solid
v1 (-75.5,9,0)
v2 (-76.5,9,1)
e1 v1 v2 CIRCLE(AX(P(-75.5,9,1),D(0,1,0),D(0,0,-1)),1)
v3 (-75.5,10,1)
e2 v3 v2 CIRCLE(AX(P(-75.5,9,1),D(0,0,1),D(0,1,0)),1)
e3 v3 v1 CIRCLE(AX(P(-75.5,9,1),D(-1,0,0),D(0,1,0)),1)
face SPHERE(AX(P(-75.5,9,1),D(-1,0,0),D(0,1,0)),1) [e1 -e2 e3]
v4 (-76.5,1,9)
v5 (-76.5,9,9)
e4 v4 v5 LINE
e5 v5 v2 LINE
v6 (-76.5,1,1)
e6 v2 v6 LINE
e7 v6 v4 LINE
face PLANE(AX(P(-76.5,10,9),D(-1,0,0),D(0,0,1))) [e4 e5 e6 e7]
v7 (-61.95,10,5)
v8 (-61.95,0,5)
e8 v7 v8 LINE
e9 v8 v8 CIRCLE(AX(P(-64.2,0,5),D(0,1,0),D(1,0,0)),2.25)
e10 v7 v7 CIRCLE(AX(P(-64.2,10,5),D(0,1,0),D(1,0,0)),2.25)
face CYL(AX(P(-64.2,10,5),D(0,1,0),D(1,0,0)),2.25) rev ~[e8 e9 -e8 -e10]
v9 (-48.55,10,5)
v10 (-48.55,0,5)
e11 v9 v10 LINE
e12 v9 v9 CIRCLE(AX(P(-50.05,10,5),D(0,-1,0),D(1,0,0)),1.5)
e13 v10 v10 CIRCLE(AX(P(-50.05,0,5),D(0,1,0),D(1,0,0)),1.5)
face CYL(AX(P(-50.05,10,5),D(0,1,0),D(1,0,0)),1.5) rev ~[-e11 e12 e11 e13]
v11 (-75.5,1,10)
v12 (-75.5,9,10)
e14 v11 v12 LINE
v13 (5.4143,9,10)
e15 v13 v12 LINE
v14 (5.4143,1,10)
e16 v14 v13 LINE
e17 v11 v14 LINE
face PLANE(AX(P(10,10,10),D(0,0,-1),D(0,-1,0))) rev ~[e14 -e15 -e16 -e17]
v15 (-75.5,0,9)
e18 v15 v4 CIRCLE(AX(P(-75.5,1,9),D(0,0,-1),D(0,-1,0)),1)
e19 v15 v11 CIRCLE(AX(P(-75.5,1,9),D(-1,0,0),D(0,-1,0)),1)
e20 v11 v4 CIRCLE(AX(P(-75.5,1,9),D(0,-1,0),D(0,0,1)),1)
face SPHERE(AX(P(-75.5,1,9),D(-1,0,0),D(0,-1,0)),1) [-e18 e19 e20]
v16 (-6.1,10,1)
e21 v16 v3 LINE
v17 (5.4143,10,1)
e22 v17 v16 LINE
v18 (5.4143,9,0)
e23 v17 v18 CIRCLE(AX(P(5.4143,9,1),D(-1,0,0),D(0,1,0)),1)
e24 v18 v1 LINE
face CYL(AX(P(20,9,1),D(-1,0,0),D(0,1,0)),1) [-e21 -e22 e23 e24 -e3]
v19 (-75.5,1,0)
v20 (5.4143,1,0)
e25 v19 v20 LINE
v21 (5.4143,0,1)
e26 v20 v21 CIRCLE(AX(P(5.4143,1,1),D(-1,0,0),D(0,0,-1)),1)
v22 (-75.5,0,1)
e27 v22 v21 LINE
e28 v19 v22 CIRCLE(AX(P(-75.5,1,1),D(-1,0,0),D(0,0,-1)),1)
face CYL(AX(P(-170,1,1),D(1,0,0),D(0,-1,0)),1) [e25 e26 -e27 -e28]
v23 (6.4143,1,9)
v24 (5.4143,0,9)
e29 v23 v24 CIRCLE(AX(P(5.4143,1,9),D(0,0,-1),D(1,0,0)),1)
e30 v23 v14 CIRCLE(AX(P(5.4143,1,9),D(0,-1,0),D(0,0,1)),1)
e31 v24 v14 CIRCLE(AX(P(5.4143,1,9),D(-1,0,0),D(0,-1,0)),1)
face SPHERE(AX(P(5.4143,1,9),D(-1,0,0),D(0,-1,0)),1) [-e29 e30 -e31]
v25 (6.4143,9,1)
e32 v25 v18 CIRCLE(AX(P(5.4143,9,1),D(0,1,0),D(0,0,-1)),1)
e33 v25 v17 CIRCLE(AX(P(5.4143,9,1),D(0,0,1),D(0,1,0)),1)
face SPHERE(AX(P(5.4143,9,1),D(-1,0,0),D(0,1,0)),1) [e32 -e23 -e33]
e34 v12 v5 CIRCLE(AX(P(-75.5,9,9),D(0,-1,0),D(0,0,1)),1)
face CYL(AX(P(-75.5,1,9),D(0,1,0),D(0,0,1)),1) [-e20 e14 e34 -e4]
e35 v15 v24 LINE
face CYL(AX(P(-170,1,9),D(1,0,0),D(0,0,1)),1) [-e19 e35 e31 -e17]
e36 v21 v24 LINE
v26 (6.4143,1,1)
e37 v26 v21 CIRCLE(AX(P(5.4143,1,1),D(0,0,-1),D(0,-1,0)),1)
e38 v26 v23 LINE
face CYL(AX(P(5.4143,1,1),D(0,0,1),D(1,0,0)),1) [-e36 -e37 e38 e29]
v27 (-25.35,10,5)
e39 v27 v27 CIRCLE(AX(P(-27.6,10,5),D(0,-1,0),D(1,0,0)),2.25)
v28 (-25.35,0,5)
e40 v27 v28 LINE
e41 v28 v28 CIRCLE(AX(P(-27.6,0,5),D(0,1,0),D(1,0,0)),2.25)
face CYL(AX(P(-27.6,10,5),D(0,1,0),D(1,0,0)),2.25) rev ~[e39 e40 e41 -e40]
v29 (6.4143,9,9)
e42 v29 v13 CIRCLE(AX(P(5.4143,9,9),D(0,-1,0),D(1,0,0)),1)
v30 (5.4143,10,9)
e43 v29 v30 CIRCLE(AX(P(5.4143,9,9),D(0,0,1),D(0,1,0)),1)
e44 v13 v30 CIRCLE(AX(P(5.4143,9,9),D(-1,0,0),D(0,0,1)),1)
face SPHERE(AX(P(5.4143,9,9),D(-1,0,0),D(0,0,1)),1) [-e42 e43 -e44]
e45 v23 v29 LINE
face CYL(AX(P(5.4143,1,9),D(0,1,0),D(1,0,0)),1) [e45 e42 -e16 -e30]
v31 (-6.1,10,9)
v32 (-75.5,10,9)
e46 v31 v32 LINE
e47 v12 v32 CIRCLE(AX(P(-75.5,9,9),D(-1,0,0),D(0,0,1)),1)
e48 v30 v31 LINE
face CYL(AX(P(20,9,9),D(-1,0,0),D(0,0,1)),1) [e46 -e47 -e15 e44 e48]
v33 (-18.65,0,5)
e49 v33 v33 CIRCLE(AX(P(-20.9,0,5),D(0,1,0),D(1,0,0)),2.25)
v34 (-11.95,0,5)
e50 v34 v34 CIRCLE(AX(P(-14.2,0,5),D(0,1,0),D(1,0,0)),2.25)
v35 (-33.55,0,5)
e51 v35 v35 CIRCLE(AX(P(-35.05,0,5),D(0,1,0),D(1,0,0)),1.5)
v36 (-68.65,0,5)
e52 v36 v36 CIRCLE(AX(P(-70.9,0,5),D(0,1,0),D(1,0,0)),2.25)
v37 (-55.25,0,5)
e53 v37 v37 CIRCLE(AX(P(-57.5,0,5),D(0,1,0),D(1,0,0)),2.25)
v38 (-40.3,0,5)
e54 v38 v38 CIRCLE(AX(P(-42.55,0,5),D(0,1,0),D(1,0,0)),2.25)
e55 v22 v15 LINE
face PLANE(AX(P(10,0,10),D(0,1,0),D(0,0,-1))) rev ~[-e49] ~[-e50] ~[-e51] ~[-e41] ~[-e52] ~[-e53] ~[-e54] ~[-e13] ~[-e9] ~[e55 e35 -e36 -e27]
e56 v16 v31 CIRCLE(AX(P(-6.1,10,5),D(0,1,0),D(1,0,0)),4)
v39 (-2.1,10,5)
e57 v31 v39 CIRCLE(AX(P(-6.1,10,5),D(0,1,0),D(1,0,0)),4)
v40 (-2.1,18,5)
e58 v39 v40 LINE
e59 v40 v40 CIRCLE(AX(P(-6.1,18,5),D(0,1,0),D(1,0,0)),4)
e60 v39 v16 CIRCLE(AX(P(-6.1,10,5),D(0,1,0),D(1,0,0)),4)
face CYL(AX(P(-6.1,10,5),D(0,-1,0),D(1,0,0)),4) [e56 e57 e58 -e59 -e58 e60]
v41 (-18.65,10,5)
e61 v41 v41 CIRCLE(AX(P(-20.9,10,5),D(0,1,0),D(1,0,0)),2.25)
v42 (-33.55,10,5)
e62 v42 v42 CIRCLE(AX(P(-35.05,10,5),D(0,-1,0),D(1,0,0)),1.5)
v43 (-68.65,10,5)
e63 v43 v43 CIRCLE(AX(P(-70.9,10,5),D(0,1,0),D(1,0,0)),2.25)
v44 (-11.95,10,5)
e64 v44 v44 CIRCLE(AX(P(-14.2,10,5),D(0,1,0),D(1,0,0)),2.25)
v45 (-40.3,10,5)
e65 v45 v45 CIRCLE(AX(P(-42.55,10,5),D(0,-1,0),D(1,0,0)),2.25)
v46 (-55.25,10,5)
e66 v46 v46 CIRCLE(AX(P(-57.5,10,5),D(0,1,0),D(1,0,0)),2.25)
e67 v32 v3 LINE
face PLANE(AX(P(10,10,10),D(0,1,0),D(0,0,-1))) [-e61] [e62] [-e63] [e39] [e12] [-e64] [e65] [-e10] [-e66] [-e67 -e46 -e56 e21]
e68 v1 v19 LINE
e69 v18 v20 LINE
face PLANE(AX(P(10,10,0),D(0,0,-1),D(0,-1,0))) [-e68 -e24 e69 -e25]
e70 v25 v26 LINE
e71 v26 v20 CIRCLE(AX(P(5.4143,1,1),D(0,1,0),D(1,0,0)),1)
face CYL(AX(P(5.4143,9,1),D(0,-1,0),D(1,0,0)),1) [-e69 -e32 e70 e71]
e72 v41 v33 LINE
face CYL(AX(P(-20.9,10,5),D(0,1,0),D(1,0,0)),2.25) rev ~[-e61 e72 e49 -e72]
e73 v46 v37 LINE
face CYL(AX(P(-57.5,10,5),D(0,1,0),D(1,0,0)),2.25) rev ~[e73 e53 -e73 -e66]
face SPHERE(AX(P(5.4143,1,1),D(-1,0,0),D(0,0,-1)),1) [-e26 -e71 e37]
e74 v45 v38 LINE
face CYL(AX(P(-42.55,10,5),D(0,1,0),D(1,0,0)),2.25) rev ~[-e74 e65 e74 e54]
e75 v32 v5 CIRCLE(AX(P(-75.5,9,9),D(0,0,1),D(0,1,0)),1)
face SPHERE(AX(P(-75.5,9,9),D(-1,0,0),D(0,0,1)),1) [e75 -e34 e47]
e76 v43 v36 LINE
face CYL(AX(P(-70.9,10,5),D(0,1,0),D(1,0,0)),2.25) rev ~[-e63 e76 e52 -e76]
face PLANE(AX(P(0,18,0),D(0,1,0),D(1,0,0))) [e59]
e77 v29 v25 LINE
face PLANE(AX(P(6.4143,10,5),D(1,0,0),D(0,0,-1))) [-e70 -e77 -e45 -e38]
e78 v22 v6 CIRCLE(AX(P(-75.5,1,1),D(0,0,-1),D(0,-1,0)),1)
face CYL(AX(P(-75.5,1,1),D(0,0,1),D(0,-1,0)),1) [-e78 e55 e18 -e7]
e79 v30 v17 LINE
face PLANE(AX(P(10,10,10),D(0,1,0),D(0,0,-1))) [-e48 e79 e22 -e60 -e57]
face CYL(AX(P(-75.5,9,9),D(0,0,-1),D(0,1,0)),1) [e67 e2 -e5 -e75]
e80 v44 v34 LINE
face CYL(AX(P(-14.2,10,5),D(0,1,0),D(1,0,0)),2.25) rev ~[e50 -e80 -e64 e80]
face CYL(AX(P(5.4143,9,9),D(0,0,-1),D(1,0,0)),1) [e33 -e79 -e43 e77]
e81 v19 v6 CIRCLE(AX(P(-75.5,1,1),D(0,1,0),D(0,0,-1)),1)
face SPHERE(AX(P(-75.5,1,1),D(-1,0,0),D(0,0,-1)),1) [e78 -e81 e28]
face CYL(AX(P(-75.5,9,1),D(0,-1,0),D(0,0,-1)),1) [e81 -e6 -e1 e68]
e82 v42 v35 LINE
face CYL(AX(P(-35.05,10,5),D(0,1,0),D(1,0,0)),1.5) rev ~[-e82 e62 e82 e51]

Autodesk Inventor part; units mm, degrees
ref_plane "YZ Plane" through (0, 0, 0) normal (1, 0, 0) x (0, 1, 0)
ref_plane "XZ Plane" through (0, 0, 0) normal (0, 1, 0) x (-1, 0, 0)
ref_plane "XY Plane" through (0, 0, 0) normal (0, 0, 1) x (1, 0, 0)
sketch "Sketch1" plane through (0, 0, 0) normal (0, 1, 0) x (-1, 0, 0)
  line L0 (0, 0) -> (170, 0)
  line L1 (170, 0) -> (170, 10)
  line L2 (170, 10) -> (0, 10)
  line L3 (0, 10) -> (0, 0)
  dimension "d0" = 170
  dimension "d1" = 10
extrude "Extrusion1" add sketch "Sketch1" along normal blind 10
sketch "Sketch2" plane through (0, 10, 0) normal (0, 1, 0) x (1, 0, 0)
  line L0 (0, -10) -> (0, 0) projected
  line L1 (0, -5) -> (-2.2, -5)
  circle A0 centre (-6.1, -5) radius 3.9
  line L2 (0, 0) -> (-170, 0) projected
  line L3 (-170, -10) -> (0, -10) projected
  circle A1 centre (-75, -5) radius 1.5
  circle A2 centre (-95, -5) radius 1.5
  dimension "d4" = 2.2
  dimension "d8" = 3
  dimension "d9" = 3
extrude "Extrusion2" cut sketch "Sketch2" against normal blind 10 contours A1
extrude "Extrusion3" cut sketch "Sketch2" against normal blind 10 contours A2
extrude "Extrusion4" cut sketch "Sketch2" against normal blind 10 contours A0
sketch "Sketch3" plane through (0, 10, 0) normal (0, 1, 0) x (1, 0, 0)
  line L0 (-170, 0) -> (-170, -10) projected
  line L1 (-170, -5) -> (-10, -5)
  circle A0 centre (-6.1, -5) radius 3.9 projected
  line L2 (-165.7, -5) -> (-163.45, -5)
  circle A1 centre (-163.45, -5) radius 2.25
  circle A2 centre (-153.45, -5) radius 2.25
  circle A3 centre (-143.45, -5) radius 2.25
  circle A4 centre (-133.45, -5) radius 2.25
  circle A5 centre (-123.45, -5) radius 2.25
  circle A6 centre (-113.45, -5) radius 2.25
  circle A7 centre (-103.45, -5) radius 2.25
  circle A8 centre (-95, -5) radius 1.5 projected
  line L3 (-93.5, -5) -> (-93.5, -7.9104)
  circle A9 centre (-75, -5) radius 1.5 projected
  line L4 (-76.5, -5) -> (-76.5, -7.25)
  line L5 (-93.5, -5) -> (-76.5, -5)
  line L6 (-85, -5) -> (-93.5, -5)
  line L7 (-85, -5) -> (-76.5, -5)
  circle A10 centre (-80.75, -5) radius 2.25
  circle A11 centre (-89.25, -5) radius 2.25
  line L8 (-10, -5) -> (-12, -5)
  line L9 (-10, -5) -> (-14.3, -5)
  line L10 (-14.3, -5) -> (-16.55, -5)
  circle A12 centre (-16.55, -5) radius 2.25
  circle A13 centre (-26.55, -5) radius 2.25
  circle A14 centre (-36.55, -5) radius 2.25
  circle A15 centre (-46.55, -5) radius 2.25
  circle A16 centre (-56.55, -5) radius 2.25
  circle A17 centre (-66.55, -5) radius 2.25
  point P0 (0, 0)
  point P1 (-155.7, -5)
  point P2 (-145.7, -5)
  point P3 (-135.7, -5)
  point P4 (-125.7, -5)
  point P5 (-115.7, -5)
  point P6 (-105.7, -5)
  point P7 (-24.3, -5)
  point P8 (-34.3, -5)
  point P9 (-44.3, -5)
  point P10 (-54.3, -5)
  point P11 (-64.3, -5)
  dimension "d20" = 10
  dimension "d32" = 10
extrude "Extrusion5" cut sketch "Sketch3" against normal blind 10 contours A1 L1 | L1 A1 | L1 A12 | L1 A12 | A2 L1 | L1 A2 | A3 L1 | L1 A3 | A4 L1 | L1 A4 | A5 L1 | L1 A5 | A6 L1 | L1 A6 | A7 L1 | L1 A7 | A11 L1 | L1 A11 | A10 L1 | L1 A10 | A17 L1 | L1 A17 | A16 L1 | L1 A16 | A15 L1 | L1 A15 | A14 L1 | L1 A14 | A13 L1 | L1 A13
thread "Thread1" size "M3x0.5" class "6H" standard "ANSI Metric M Profile" full length
thread "Thread2" size "M3x0.5" class "6H" standard "ANSI Metric M Profile" full length
sketch "Sketch4" plane through (0, 10, 0) normal (0, 1, 0) x (1, 0, 0)
  circle A0 centre (-16.55, -5) radius 2.25 projected
  circle A1 centre (-16.55, -5) radius 2.25
  point P0 (0, 0)
extrude "Extrusion6" add sketch "Sketch4" against normal blind 10
sketch "Sketch5" plane through (0, 0, 10) normal (1, 0, 0) x (0, 0, -1)
  line L0 (10, 0) -> (0, 0) projected
  line L1 (0, 0) -> (0, 10) projected
  line L2 (10, 0) -> (0, 0)
  line L3 (0, 0) -> (0, 10)
  line L4 (0, 10) -> (10, 10)
  line L5 (10, 10) -> (10, 0)
extrude "Extrusion7" add sketch "Sketch5" along normal blind 10
sketch "Sketch6" plane through (10, 0, 10) normal (1, 0, 0) x (0, 0, -1)
  line L0 (0, 0) -> (10, 0) projected
  line L1 (0, 10) -> (0, 0) projected
  line L2 (10, 0) -> (0, 0)
  line L3 (0, 0) -> (0, 10)
  line L4 (0, 10) -> (10, 10)
  line L5 (10, 10) -> (10, 0)
extrude "Extrusion8" add sketch "Sketch6" along normal blind 10
sketch "Sketch7" plane through (0, 10, 0) normal (0, 1, 0) x (1, 0, 0)
  point P0 (0, 0)
fillet "Fillet3" radius 1 11 edges at (-75, 10, 10) (-75, 0, 10) (-75, 10, 0) (20, 5, 10) (20, 5, 0) (20, 0, 5) (-170, 10, 5) (-170, 5, 10) (-170, 5, 0) (-170, 0, 5) (-75, 0, 0)
fillet "Fillet4" radius 1 3 edges at (19.7071, 9.7071, 9.7071) (19.7071, 9.7071, 0.2929) (20, 10, 5)
sketch "Sketch8" plane through (19, 1, 0) normal (0, 0, -1) x (-1, 0, 0)
  point P0 (19, -1)
sketch "Sketch9" plane through (0, 10, 0) normal (0, 1, 0) x (1, 0, 0)
  circle A0 centre (-6.1, -5) radius 3.9 projected
  circle A1 centre (-6.1, -5) radius 2.5
  point P0 (0, 0)
  dimension "d53" = 5
extrude "Extrusion9" add sketch "Sketch9" against normal blind 10
sketch "Sketch10" plane through (0, 10, 0) normal (0, 1, 0) x (1, 0, 0)
  circle A0 centre (-6.1, -5) radius 2.5 projected
  line L0 (-3.6, -5) -> (1.4, -5)
  line L1 (19, -9) -> (19, -1) projected
  line L2 (1.4, -5) -> (-76.5, -5)
  circle A1 centre (-75, -5) radius 1.5 projected
  line L3 (-76.5, -5) -> (-76.5, -10.0231)
  line L4 (-76.5, -10.0231) -> (-76.5, 0)
  line L5 (-76.5, -10.0231) -> (-169.9715, -10.0231)
  line L6 (-169, -9) -> (19, -9) projected
  line L7 (-169.9715, 0) -> (-76.5, 0)
  line L8 (-169.9715, -10.0231) -> (-170.1763, -9.372)
  line L9 (-170.1763, -9.372) -> (-170.4489, -3.7164)
  line L10 (-170.4489, -3.7164) -> (-170.4593, -3.5)
  line L11 (-170.4593, -3.5) -> (-170.4593, -0.543)
  line L12 (-170.4593, -0.543) -> (-169.9715, 0)
  point P0 (0, 0)
  dimension "d56" = 5
extrude "Extrusion10" cut sketch "Sketch10" against normal blind 10 contours L3 L5 L8 L9 L10 L11 L12 L7 L4
sketch "Sketch11" plane through (0, 10, 0) normal (0, 1, 0) x (1, 0, 0)
  circle A0 centre (-75, -5) radius 1.5 projected
  circle A1 centre (-75, -5) radius 1.5
  circle A2 centre (-66.55, -5) radius 2.25 projected
  circle A3 centre (-66.55, -5) radius 2.25
  circle A4 centre (-56.55, -5) radius 2.25 projected
  circle A5 centre (-56.55, -5) radius 2.25
  circle A6 centre (-46.55, -5) radius 2.25 projected
  circle A7 centre (-46.55, -5) radius 2.25
  circle A8 centre (-36.55, -5) radius 2.25 projected
  circle A9 centre (-36.55, -5) radius 2.25
  circle A10 centre (-26.55, -5) radius 2.25 projected
  circle A11 centre (-26.55, -5) radius 2.25
  point P0 (0, 0)
  point P1 (-76.5, -5)
extrude "Extrusion11" add sketch "Sketch11" against normal blind 10
sketch "Sketch12" plane through (0, 10, 0) normal (0, 1, 0) x (1, 0, 0)
  circle A0 centre (-6.1, -5) radius 2.5 projected
  line L0 (-8.6, -5) -> (-76.5, -5)
  line L1 (-76.5, -9) -> (-76.5, -1) projected
  line L2 (-42.55, -5) -> (-27.55, -5)
  line L3 (-42.55, -5) -> (-57.55, -5)
  line L4 (-42.55, -5) -> (-50.05, -5)
  line L5 (-42.55, -5) -> (-35.05, -5)
  circle A1 centre (-50.05, -5) radius 1.5
  circle A2 centre (-35.05, -5) radius 1.5
  line L6 (-3.6, -5) -> (6.4143, -5)
  line L7 (6.4143, -5) -> (6.4143, -10.3738)
  line L8 (6.4143, -10.3738) -> (6.4143, 1.3096)
  line L9 (6.4143, 1.3096) -> (23.7189, 1.3096)
  line L10 (23.7189, 1.3096) -> (24.3802, -13.5702)
  line L11 (24.3802, -13.5702) -> (6.4143, -10.3738)
  point P0 (0, 0)
  dimension "d61" = 15
  dimension "d62" = 15
  dimension "d63" = 3
  dimension "d64" = 3
extrude "Extrusion12" cut sketch "Sketch12" against normal blind 10 contours A2 L0 | L0 A2 | A1 L0 | L0 A1 | L8 L9 L10 L11 L7
sketch "Sketch13" plane through (0, 10, 0) normal (0, 1, 0) x (1, 0, 0)
  circle A0 centre (-50.05, -5) radius 1.5 projected
  line L0 (-48.55, -5) -> (-36.55, -5)
  circle A1 centre (-35.05, -5) radius 1.5 projected
  circle A2 centre (-42.55, -5) radius 2.25
  line L1 (-51.55, -5) -> (-55.25, -5)
  line L2 (-33.55, -5) -> (-29.85, -5)
  circle A3 centre (-57.5, -5) radius 2.25
  circle A4 centre (-27.6, -5) radius 2.25
  circle A5 centre (-20.9, -5) radius 2.25
  circle A6 centre (-14.2, -5) radius 2.25
  circle A7 centre (-64.2, -5) radius 2.25
  circle A8 centre (-70.9, -5) radius 2.25
  point P0 (0, 0)
  dimension "d67" = 4.5
  dimension "d68" = 3.7
  dimension "d69" = 3.7
  dimension "d71" = 4.5
  dimension "d73" = 4.5
  dimension "d83" = 6.7
  dimension "d90" = 6.7
extrude "Extrusion13" cut sketch "Sketch13" against normal blind 10 contours A3 | A4 | A5 | A6 | A7 | A8
sketch "Sketch14" plane through (0, 10, 0) normal (0, 1, 0) x (1, 0, 0)
  circle A0 centre (-57.5, -5) radius 2.25 projected
  line L0 (-55.25, -5) -> (-29.85, -5)
  circle A1 centre (-27.6, -5) radius 2.25 projected
  circle A2 centre (-42.55, -5) radius 2.25
  point P0 (0, 0)
  dimension "d97" = 4.5
extrude "Extrusion14" cut sketch "Sketch14" against normal blind 10 contours A2 L0 | L0 A2
thread "Thread3" size "M3x0.5" class "6H" standard "ANSI Metric M Profile" full length
thread "Thread4" size "M3x0.5" class "6H" standard "ANSI Metric M Profile" full length
fillet "Fillet5" radius 1 16 edges at (-76.5, 9.7071, 9.7071) (-76.5, 5, 10) (-76.5, 0.2929, 9.7071) (-76.5, 0, 5) (-76.5, 0.2929, 0.2929) (-76.5, 5, 0) (-76.5, 9.7071, 0.2929) (-76.5, 10, 5) (6.4143, 9.7071, 0.2929) (6.4143, 5, 0) (6.4143, 0.2929, 0.2929) (6.4143, 0, 5) (6.4143, 0.2929, 9.7071) (6.4143, 5, 10) (6.4143, 9.7071, 9.7071) (6.4143, 10, 5)
sketch "Sketch15" plane through (0, 10, 0) normal (0, 1, 0) x (1, 0, 0)
  circle A0 centre (-6.1, -5) radius 2.5 projected
  circle A1 centre (-6.1, -5) radius 2.75
  point P0 (0, 0)
  dimension "d105" = 5.5
extrude "Extrusion15" cut sketch "Sketch15" against normal blind 10 contours A0 | A1
sketch "Sketch16" plane through (0, 10, 0) normal (0, 1, 0) x (1, 0, 0)
  circle A0 centre (-6.1, -5) radius 2.75 projected
  circle A1 centre (-6.1, -5) radius 4
  point P0 (0, 0)
  dimension "d108" = 8
extrude "Extrusion16" add sketch "Sketch16" against normal blind 10 contours A0 | A1
extrude "Extrusion17" add sketch "Sketch16" along normal blind 8 contours A0 | A1
properties part number "brazo de servo el d vdd - camara"
